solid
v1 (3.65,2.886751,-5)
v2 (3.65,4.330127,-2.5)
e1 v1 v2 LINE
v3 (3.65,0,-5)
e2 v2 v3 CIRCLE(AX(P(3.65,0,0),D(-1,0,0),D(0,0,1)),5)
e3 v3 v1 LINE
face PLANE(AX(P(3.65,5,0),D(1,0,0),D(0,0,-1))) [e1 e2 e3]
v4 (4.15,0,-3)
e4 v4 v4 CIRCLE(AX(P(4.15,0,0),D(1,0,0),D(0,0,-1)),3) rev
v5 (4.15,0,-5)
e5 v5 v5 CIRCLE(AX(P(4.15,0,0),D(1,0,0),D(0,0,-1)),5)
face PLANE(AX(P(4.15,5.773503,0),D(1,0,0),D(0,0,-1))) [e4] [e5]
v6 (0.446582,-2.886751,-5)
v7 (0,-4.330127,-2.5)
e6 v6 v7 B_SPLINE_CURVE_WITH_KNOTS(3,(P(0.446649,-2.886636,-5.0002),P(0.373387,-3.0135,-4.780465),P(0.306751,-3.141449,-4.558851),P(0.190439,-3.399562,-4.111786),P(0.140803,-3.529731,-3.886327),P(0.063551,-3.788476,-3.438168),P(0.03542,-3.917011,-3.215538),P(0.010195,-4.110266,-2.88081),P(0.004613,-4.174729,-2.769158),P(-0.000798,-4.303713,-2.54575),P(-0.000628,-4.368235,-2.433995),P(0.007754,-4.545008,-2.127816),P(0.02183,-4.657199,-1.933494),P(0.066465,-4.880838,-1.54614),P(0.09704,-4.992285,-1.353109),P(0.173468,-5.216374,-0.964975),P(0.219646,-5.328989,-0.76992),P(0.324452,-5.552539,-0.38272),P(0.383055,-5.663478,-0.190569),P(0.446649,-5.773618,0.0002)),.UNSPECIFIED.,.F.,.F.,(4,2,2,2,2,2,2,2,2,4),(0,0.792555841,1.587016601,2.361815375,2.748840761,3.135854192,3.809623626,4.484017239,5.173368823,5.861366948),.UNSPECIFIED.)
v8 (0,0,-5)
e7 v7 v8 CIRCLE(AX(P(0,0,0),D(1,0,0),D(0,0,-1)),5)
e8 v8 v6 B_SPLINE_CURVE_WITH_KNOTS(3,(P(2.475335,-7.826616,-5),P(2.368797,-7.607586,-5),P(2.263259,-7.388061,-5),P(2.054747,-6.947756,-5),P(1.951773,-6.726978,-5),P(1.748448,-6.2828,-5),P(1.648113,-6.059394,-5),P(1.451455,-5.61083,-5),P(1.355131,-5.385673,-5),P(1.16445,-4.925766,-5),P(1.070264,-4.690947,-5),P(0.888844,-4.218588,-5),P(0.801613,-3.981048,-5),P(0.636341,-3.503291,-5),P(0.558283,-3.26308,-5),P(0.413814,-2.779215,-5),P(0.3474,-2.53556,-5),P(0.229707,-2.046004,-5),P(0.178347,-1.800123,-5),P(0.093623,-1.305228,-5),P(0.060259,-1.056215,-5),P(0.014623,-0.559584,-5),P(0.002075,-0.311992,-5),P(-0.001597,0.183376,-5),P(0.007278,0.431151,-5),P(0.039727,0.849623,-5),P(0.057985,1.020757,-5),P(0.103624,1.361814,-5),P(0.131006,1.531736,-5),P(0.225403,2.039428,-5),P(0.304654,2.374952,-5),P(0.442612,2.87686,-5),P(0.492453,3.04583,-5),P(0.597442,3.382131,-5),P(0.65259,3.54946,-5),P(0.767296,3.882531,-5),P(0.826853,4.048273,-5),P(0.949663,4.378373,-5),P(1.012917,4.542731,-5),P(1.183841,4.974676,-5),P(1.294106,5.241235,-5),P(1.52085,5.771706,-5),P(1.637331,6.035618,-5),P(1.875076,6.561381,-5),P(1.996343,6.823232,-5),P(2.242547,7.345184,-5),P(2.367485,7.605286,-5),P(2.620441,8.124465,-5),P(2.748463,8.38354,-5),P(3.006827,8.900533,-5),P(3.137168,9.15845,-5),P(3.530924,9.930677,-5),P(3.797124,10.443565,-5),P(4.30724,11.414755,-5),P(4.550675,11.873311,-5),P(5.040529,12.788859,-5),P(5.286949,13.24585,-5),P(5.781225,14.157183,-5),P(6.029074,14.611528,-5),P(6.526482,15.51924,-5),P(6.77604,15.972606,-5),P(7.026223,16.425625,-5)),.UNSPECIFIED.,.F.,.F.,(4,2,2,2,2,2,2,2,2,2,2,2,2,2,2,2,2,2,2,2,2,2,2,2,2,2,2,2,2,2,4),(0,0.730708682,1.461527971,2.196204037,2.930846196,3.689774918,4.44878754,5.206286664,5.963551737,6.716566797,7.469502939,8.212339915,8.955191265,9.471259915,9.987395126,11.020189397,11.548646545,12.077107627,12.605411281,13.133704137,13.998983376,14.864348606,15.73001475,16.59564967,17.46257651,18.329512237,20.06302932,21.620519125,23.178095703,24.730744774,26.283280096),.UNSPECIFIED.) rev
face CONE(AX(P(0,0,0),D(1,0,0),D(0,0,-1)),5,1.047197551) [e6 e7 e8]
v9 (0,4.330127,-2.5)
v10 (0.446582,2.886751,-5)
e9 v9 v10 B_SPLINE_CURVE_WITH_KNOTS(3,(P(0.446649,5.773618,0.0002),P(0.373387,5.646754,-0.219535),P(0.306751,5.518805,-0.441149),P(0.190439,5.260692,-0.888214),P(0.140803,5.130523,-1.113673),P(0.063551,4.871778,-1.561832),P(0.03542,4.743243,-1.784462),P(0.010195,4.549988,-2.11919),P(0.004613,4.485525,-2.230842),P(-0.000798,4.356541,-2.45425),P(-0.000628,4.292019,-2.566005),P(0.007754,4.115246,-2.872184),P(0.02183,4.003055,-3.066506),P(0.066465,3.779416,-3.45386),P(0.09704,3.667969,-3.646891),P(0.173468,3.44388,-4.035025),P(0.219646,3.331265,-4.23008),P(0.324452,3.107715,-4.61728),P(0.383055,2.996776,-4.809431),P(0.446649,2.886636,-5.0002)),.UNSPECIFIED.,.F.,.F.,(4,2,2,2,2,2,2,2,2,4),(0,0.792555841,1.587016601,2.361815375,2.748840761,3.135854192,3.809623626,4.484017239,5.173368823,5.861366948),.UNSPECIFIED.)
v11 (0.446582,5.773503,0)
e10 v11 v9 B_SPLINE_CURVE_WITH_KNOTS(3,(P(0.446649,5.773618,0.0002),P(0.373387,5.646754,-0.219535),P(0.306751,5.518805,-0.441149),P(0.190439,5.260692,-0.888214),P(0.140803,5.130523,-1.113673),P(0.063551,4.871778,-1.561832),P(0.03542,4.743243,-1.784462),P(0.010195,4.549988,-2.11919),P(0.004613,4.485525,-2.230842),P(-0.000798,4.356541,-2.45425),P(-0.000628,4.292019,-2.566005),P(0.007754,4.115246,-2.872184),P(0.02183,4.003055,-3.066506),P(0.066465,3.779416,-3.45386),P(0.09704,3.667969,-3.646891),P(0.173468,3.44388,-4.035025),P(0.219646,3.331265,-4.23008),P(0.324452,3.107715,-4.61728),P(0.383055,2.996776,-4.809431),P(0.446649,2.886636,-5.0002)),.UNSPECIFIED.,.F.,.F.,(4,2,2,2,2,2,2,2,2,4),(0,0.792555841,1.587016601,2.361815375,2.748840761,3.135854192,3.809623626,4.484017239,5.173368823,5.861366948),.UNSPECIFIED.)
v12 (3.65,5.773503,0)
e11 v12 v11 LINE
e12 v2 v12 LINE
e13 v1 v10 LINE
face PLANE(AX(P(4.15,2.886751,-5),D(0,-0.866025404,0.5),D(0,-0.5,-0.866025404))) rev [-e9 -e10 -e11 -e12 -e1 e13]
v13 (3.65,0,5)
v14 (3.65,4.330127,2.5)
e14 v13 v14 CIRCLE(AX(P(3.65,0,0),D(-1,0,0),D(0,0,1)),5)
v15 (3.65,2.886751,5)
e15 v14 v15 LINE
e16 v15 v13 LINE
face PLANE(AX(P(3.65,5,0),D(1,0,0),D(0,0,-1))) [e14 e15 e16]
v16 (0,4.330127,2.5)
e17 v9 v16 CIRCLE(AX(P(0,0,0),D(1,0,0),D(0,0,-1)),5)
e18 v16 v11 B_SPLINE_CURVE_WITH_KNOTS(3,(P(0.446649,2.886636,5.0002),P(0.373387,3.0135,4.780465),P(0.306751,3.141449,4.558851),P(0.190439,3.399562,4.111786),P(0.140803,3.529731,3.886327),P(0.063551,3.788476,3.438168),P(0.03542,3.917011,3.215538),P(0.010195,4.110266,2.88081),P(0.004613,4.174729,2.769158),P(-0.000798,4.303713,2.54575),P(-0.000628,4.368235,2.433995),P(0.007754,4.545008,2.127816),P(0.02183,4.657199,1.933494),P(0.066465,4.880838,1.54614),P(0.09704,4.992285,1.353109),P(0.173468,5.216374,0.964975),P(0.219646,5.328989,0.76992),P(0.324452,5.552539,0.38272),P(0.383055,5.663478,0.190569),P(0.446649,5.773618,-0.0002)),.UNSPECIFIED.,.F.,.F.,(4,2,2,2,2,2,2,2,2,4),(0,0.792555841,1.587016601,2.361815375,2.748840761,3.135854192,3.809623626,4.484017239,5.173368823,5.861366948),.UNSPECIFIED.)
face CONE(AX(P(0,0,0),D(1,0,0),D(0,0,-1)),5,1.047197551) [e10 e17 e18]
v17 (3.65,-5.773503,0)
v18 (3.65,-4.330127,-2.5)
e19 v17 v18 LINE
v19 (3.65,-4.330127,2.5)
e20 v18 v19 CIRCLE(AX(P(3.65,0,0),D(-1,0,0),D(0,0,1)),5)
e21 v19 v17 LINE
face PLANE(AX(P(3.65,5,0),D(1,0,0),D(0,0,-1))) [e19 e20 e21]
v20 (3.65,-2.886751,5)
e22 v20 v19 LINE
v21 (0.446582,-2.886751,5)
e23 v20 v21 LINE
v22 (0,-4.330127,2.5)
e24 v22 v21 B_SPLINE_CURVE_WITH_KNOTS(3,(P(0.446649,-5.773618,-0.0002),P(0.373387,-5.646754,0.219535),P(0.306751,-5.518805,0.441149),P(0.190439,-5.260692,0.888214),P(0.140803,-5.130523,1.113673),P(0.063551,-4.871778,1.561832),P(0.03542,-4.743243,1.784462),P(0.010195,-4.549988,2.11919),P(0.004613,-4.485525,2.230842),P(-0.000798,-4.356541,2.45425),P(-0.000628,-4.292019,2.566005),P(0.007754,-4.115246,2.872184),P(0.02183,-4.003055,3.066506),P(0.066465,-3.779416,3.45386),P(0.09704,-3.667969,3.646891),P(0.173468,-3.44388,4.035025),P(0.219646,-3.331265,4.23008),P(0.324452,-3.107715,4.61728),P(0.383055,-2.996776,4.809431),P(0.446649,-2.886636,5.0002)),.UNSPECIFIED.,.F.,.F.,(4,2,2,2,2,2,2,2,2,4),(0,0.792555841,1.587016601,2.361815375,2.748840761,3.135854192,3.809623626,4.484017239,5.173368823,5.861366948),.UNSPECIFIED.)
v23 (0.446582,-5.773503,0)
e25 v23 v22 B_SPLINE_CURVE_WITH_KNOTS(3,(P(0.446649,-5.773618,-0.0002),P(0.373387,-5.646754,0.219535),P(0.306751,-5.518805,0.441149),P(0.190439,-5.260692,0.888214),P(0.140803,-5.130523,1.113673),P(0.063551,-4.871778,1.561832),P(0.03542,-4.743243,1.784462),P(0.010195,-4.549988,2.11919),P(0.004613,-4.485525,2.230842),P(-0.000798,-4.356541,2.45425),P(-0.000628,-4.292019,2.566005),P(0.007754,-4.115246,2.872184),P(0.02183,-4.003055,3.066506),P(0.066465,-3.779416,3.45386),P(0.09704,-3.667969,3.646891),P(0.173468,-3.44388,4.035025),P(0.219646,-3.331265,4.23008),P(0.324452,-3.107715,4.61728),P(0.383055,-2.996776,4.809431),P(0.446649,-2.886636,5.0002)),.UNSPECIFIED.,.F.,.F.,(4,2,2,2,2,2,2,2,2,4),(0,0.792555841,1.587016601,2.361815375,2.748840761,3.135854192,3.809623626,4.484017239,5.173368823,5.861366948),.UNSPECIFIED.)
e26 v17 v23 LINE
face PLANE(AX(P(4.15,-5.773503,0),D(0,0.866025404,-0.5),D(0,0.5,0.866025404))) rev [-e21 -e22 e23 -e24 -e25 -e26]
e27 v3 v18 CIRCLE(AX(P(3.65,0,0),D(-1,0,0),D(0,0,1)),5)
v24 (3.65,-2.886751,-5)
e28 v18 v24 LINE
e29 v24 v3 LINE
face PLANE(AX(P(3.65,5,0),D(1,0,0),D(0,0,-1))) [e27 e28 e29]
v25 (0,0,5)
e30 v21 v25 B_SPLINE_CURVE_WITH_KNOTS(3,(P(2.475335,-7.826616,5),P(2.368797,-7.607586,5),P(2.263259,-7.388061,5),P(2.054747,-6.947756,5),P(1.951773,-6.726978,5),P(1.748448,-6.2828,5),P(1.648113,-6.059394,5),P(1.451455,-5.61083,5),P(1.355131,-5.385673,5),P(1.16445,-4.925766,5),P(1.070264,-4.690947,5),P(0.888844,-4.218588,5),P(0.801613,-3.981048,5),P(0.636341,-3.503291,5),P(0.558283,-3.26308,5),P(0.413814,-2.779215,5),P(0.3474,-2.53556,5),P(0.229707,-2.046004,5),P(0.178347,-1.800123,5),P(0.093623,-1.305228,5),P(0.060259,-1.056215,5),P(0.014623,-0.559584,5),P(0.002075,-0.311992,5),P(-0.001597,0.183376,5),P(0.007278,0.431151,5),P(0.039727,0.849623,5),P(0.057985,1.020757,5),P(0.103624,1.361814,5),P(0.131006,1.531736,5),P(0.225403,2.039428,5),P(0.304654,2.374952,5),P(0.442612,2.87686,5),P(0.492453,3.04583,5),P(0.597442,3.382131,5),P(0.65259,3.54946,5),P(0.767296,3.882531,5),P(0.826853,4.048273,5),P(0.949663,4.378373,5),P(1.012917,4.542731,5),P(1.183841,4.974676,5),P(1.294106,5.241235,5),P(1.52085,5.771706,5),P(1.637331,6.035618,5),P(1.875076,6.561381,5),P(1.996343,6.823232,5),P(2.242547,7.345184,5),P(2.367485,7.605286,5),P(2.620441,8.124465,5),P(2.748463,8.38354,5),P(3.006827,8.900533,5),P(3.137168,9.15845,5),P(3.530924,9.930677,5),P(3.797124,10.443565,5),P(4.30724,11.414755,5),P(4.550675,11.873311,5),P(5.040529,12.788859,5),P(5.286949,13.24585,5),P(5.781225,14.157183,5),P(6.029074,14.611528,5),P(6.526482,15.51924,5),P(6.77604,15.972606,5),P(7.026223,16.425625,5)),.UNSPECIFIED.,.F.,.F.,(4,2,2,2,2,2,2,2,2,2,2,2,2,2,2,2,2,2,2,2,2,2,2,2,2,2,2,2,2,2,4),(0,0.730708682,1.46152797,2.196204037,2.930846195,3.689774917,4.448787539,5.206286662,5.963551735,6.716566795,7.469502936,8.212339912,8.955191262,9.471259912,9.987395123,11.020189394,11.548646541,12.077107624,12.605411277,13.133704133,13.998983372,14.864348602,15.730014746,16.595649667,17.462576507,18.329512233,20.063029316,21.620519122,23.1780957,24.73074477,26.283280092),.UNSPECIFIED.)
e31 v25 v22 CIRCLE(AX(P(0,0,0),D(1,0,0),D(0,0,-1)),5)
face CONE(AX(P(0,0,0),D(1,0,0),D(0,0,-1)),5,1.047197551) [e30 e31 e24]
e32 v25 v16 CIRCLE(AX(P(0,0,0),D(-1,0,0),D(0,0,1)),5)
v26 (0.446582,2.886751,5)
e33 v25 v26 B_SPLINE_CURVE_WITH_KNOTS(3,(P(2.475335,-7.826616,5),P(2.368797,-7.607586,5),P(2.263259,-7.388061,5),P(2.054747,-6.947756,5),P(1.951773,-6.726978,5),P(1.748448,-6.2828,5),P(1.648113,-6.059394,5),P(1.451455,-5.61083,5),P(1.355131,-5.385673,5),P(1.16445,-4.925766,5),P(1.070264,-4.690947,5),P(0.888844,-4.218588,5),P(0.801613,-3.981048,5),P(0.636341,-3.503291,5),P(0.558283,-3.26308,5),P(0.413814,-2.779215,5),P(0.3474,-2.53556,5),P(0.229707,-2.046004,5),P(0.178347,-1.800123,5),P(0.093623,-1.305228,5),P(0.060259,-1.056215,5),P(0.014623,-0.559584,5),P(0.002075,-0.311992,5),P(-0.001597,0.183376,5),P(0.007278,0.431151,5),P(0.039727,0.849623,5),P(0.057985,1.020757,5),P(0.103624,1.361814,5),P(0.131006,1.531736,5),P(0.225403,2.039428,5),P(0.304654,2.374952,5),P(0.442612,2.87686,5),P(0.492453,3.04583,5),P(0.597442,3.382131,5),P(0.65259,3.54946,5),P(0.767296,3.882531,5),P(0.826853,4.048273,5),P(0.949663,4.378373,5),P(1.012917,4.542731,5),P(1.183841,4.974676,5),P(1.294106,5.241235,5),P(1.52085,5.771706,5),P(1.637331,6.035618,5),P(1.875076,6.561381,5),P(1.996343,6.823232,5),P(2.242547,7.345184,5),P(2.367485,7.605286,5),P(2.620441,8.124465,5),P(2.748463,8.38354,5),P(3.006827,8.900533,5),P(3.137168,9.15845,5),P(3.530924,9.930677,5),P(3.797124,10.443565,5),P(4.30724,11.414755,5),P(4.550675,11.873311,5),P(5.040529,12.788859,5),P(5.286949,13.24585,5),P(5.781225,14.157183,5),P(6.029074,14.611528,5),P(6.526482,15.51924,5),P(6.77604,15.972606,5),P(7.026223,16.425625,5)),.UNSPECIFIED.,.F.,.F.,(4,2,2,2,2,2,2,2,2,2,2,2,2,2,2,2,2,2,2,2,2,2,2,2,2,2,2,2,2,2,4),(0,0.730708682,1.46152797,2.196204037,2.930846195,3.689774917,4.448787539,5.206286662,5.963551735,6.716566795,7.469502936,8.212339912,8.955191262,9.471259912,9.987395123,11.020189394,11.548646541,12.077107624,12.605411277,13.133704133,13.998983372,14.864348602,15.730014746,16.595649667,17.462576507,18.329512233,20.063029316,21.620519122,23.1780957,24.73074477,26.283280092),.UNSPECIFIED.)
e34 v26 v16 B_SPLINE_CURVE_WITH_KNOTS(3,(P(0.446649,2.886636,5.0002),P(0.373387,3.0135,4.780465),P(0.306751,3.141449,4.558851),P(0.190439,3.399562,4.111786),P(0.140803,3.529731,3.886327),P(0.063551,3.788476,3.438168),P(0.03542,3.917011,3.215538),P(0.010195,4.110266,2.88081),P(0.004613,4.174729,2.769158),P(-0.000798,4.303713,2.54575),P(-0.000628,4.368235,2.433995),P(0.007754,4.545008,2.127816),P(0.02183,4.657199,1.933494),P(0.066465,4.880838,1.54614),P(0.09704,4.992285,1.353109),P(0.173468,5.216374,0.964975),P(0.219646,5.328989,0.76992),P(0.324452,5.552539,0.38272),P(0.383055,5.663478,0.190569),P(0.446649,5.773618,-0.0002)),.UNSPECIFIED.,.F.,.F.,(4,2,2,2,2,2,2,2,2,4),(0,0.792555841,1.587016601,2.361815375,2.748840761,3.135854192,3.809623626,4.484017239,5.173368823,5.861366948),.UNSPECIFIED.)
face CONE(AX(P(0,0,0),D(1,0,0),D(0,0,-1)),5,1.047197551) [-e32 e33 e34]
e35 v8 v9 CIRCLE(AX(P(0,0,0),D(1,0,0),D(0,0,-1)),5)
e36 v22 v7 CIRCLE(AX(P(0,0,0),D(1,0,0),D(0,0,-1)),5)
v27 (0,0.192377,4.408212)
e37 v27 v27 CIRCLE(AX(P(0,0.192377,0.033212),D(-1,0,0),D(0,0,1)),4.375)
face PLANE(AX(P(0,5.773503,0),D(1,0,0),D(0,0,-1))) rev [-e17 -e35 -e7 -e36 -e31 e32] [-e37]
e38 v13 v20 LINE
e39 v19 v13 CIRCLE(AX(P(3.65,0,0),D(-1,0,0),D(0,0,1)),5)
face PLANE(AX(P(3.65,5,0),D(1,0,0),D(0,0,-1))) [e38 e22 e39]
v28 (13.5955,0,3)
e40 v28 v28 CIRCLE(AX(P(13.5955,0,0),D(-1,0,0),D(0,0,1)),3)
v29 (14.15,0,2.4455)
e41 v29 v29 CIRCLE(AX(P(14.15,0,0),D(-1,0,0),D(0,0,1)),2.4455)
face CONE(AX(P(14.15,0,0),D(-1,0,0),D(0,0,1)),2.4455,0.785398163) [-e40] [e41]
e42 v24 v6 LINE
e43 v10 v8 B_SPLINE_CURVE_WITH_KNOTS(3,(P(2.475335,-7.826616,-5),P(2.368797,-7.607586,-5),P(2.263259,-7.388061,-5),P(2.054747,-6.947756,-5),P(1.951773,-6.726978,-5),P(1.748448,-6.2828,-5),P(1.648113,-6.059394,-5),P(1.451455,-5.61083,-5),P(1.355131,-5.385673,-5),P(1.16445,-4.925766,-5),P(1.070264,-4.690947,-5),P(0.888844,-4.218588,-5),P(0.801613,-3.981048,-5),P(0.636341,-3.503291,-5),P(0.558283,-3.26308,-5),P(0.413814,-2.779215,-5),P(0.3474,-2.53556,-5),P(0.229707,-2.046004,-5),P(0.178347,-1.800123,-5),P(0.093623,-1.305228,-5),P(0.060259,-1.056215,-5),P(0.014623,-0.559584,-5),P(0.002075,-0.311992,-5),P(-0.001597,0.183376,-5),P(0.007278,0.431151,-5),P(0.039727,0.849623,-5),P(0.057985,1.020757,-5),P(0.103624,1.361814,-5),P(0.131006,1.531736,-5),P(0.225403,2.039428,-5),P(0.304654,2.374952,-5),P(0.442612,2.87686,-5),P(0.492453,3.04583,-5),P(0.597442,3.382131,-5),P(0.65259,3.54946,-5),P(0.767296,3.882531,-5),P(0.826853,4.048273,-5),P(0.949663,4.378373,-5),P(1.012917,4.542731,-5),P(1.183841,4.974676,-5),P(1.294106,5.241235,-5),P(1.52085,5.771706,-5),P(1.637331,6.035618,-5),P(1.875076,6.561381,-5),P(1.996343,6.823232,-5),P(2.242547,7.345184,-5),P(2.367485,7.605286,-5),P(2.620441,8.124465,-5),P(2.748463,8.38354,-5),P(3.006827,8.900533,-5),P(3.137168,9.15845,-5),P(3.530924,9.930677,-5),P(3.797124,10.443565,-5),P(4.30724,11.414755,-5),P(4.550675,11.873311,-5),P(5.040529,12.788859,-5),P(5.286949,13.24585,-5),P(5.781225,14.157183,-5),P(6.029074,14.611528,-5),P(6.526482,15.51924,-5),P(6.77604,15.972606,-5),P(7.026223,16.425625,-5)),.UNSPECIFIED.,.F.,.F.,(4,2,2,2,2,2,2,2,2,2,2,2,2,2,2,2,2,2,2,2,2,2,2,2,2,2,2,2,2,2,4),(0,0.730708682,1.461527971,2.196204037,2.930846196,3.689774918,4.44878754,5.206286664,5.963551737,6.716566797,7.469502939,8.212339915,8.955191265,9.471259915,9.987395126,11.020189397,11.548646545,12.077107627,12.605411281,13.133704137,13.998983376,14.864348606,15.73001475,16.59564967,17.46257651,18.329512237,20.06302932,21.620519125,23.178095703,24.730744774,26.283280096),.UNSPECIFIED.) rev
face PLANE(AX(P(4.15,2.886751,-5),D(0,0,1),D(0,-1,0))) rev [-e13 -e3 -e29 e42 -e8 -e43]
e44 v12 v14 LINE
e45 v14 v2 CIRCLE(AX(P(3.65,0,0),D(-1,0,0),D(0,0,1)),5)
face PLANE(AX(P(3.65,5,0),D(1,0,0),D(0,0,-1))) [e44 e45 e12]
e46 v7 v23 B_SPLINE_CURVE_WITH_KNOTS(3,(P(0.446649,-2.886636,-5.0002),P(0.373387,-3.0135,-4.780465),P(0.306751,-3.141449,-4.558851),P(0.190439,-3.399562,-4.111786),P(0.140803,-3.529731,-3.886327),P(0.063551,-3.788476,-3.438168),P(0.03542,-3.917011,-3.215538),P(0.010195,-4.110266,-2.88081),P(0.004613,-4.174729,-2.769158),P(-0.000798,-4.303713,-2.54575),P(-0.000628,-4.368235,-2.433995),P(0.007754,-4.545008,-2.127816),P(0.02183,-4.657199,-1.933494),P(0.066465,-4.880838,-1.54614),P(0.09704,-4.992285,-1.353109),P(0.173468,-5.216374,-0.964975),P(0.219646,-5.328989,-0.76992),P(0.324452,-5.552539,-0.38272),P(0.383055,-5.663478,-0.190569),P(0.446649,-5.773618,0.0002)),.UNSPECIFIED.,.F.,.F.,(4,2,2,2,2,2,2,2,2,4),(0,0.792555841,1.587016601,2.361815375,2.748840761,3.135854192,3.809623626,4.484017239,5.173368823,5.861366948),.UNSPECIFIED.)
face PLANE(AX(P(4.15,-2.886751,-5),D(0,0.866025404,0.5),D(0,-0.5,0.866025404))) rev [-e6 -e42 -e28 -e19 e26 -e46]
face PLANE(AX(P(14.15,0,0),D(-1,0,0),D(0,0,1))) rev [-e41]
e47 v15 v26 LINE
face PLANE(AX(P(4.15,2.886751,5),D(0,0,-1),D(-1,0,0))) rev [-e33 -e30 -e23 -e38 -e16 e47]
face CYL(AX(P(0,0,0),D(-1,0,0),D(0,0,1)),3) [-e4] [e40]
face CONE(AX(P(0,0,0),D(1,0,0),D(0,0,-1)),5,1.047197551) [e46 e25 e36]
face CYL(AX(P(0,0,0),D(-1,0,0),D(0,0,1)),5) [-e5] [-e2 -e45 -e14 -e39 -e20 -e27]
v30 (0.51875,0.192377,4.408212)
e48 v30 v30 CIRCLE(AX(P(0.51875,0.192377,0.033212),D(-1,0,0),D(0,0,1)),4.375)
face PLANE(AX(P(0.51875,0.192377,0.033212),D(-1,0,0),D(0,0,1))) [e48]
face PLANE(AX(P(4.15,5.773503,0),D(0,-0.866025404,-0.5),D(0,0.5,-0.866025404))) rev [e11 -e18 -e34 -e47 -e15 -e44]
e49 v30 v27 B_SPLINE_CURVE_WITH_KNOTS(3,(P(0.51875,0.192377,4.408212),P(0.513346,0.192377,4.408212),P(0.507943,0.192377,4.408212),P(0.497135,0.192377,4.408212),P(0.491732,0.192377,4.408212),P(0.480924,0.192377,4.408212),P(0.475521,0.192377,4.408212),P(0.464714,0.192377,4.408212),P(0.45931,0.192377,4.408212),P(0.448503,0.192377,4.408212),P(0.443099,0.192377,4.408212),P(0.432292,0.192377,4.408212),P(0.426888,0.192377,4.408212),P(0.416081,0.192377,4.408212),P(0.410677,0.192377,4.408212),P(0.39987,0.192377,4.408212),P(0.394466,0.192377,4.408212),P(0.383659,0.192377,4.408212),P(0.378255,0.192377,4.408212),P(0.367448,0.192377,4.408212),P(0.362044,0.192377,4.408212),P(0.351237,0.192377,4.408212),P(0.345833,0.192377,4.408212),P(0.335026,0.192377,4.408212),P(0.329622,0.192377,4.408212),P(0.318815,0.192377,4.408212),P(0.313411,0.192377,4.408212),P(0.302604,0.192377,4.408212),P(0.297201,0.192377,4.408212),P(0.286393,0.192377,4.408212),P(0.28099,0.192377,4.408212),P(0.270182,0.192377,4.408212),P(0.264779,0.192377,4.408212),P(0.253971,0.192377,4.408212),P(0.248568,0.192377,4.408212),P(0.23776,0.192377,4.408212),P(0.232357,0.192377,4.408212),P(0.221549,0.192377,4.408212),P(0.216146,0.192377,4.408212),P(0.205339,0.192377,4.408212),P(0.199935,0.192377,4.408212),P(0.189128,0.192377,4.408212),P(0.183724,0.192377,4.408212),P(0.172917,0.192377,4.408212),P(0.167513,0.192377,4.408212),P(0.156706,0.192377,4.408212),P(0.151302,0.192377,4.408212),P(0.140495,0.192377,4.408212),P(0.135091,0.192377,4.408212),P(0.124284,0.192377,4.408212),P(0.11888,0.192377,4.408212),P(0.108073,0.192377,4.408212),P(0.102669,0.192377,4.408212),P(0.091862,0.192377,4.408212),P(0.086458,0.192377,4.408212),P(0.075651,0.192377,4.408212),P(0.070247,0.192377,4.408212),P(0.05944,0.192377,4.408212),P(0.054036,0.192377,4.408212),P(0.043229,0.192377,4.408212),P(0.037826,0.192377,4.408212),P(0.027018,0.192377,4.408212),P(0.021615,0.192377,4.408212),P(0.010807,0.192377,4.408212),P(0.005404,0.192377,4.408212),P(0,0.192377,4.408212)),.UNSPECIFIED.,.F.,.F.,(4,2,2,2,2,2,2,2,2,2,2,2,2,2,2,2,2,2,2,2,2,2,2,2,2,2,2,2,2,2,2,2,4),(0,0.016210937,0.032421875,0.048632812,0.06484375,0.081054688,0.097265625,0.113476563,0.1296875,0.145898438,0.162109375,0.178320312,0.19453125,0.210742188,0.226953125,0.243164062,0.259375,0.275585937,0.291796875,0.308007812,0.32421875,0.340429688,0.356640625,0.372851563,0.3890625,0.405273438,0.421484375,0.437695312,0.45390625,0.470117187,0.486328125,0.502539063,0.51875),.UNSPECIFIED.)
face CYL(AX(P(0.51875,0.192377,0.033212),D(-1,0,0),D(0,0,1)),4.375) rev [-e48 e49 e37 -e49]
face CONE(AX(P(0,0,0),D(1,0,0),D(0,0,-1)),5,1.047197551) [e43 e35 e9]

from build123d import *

# Parameters (mm, degrees)
BASEHEAD_DEPTH     = 4.15
INDENT_START       = -0.51875
INDENT_2_OUTLINE_R = 4.375
INDENT_2_DEPTH     = 0.51875
SKETCH4_W          = 0.5
SKETCH4_H          = 10.773502692


# Read off the part's stored shape, not the designer's step: Indent
with BuildPart() as part:
    # Sketch1 → BaseHead (new body)
    with BuildSketch(Plane(origin=(0, 0, 0), x_dir=(0, 0, -1), z_dir=(1, 0, 0))):
        Polygon((5, 2.886751346), (5, -2.886751346), (0, -5.773502692), (-5, -2.886751346), (-5, 2.886751346), (0, 5.773502692), align=None)
    extrude(amount=BASEHEAD_DEPTH)

    # Indent outline → Indent (revolve)
    with BuildSketch(Plane.YX):
        Polygon((3, 4.15), (3, 13.5955), (2.4455, 14.15), (0, 14.15), (0, 4.15), align=None)
    revolve(axis=Axis((0, 0, 0), (1, 0, 0)))

    # Indent 2 outline → Indent 2 (cut)
    with BuildSketch(Plane.ZY.offset(INDENT_START)):
        with Locations((0.033212245, 0.192376607)):
            Circle(INDENT_2_OUTLINE_R)
    extrude(amount=INDENT_2_DEPTH, mode=Mode.SUBTRACT)

    # Sketch3 → HeadChamfer (revolve, cut)
    with BuildSketch(Plane.XY, mode=Mode.PRIVATE) as headchamfer_sk:
        Polygon((0, 5), (3.333333333, 10.773502692), (3.333333333, 15.773502692), (-10, 15.773502692), (-10, 5), align=None)
    revolve(headchamfer_sk.sketch.rotate(Axis((0, 0, 0), (1, 0, 0)), 90), axis=Axis((0, 0, 0), (1, 0, 0)), mode=Mode.SUBTRACT)

    # Sketch4 → BearingFace (revolve, cut)
    with BuildSketch(Plane.XY, mode=Mode.PRIVATE) as bearingface_sk:
        with Locations((3.9, 10.386751346)):
            Rectangle(SKETCH4_W, SKETCH4_H)
    revolve(bearingface_sk.sketch.rotate(Axis((0, 0, 0), (1, 0, 0)), 90), axis=Axis((0, 0, 0), (1, 0, 0)), mode=Mode.SUBTRACT)


solid = part.part
